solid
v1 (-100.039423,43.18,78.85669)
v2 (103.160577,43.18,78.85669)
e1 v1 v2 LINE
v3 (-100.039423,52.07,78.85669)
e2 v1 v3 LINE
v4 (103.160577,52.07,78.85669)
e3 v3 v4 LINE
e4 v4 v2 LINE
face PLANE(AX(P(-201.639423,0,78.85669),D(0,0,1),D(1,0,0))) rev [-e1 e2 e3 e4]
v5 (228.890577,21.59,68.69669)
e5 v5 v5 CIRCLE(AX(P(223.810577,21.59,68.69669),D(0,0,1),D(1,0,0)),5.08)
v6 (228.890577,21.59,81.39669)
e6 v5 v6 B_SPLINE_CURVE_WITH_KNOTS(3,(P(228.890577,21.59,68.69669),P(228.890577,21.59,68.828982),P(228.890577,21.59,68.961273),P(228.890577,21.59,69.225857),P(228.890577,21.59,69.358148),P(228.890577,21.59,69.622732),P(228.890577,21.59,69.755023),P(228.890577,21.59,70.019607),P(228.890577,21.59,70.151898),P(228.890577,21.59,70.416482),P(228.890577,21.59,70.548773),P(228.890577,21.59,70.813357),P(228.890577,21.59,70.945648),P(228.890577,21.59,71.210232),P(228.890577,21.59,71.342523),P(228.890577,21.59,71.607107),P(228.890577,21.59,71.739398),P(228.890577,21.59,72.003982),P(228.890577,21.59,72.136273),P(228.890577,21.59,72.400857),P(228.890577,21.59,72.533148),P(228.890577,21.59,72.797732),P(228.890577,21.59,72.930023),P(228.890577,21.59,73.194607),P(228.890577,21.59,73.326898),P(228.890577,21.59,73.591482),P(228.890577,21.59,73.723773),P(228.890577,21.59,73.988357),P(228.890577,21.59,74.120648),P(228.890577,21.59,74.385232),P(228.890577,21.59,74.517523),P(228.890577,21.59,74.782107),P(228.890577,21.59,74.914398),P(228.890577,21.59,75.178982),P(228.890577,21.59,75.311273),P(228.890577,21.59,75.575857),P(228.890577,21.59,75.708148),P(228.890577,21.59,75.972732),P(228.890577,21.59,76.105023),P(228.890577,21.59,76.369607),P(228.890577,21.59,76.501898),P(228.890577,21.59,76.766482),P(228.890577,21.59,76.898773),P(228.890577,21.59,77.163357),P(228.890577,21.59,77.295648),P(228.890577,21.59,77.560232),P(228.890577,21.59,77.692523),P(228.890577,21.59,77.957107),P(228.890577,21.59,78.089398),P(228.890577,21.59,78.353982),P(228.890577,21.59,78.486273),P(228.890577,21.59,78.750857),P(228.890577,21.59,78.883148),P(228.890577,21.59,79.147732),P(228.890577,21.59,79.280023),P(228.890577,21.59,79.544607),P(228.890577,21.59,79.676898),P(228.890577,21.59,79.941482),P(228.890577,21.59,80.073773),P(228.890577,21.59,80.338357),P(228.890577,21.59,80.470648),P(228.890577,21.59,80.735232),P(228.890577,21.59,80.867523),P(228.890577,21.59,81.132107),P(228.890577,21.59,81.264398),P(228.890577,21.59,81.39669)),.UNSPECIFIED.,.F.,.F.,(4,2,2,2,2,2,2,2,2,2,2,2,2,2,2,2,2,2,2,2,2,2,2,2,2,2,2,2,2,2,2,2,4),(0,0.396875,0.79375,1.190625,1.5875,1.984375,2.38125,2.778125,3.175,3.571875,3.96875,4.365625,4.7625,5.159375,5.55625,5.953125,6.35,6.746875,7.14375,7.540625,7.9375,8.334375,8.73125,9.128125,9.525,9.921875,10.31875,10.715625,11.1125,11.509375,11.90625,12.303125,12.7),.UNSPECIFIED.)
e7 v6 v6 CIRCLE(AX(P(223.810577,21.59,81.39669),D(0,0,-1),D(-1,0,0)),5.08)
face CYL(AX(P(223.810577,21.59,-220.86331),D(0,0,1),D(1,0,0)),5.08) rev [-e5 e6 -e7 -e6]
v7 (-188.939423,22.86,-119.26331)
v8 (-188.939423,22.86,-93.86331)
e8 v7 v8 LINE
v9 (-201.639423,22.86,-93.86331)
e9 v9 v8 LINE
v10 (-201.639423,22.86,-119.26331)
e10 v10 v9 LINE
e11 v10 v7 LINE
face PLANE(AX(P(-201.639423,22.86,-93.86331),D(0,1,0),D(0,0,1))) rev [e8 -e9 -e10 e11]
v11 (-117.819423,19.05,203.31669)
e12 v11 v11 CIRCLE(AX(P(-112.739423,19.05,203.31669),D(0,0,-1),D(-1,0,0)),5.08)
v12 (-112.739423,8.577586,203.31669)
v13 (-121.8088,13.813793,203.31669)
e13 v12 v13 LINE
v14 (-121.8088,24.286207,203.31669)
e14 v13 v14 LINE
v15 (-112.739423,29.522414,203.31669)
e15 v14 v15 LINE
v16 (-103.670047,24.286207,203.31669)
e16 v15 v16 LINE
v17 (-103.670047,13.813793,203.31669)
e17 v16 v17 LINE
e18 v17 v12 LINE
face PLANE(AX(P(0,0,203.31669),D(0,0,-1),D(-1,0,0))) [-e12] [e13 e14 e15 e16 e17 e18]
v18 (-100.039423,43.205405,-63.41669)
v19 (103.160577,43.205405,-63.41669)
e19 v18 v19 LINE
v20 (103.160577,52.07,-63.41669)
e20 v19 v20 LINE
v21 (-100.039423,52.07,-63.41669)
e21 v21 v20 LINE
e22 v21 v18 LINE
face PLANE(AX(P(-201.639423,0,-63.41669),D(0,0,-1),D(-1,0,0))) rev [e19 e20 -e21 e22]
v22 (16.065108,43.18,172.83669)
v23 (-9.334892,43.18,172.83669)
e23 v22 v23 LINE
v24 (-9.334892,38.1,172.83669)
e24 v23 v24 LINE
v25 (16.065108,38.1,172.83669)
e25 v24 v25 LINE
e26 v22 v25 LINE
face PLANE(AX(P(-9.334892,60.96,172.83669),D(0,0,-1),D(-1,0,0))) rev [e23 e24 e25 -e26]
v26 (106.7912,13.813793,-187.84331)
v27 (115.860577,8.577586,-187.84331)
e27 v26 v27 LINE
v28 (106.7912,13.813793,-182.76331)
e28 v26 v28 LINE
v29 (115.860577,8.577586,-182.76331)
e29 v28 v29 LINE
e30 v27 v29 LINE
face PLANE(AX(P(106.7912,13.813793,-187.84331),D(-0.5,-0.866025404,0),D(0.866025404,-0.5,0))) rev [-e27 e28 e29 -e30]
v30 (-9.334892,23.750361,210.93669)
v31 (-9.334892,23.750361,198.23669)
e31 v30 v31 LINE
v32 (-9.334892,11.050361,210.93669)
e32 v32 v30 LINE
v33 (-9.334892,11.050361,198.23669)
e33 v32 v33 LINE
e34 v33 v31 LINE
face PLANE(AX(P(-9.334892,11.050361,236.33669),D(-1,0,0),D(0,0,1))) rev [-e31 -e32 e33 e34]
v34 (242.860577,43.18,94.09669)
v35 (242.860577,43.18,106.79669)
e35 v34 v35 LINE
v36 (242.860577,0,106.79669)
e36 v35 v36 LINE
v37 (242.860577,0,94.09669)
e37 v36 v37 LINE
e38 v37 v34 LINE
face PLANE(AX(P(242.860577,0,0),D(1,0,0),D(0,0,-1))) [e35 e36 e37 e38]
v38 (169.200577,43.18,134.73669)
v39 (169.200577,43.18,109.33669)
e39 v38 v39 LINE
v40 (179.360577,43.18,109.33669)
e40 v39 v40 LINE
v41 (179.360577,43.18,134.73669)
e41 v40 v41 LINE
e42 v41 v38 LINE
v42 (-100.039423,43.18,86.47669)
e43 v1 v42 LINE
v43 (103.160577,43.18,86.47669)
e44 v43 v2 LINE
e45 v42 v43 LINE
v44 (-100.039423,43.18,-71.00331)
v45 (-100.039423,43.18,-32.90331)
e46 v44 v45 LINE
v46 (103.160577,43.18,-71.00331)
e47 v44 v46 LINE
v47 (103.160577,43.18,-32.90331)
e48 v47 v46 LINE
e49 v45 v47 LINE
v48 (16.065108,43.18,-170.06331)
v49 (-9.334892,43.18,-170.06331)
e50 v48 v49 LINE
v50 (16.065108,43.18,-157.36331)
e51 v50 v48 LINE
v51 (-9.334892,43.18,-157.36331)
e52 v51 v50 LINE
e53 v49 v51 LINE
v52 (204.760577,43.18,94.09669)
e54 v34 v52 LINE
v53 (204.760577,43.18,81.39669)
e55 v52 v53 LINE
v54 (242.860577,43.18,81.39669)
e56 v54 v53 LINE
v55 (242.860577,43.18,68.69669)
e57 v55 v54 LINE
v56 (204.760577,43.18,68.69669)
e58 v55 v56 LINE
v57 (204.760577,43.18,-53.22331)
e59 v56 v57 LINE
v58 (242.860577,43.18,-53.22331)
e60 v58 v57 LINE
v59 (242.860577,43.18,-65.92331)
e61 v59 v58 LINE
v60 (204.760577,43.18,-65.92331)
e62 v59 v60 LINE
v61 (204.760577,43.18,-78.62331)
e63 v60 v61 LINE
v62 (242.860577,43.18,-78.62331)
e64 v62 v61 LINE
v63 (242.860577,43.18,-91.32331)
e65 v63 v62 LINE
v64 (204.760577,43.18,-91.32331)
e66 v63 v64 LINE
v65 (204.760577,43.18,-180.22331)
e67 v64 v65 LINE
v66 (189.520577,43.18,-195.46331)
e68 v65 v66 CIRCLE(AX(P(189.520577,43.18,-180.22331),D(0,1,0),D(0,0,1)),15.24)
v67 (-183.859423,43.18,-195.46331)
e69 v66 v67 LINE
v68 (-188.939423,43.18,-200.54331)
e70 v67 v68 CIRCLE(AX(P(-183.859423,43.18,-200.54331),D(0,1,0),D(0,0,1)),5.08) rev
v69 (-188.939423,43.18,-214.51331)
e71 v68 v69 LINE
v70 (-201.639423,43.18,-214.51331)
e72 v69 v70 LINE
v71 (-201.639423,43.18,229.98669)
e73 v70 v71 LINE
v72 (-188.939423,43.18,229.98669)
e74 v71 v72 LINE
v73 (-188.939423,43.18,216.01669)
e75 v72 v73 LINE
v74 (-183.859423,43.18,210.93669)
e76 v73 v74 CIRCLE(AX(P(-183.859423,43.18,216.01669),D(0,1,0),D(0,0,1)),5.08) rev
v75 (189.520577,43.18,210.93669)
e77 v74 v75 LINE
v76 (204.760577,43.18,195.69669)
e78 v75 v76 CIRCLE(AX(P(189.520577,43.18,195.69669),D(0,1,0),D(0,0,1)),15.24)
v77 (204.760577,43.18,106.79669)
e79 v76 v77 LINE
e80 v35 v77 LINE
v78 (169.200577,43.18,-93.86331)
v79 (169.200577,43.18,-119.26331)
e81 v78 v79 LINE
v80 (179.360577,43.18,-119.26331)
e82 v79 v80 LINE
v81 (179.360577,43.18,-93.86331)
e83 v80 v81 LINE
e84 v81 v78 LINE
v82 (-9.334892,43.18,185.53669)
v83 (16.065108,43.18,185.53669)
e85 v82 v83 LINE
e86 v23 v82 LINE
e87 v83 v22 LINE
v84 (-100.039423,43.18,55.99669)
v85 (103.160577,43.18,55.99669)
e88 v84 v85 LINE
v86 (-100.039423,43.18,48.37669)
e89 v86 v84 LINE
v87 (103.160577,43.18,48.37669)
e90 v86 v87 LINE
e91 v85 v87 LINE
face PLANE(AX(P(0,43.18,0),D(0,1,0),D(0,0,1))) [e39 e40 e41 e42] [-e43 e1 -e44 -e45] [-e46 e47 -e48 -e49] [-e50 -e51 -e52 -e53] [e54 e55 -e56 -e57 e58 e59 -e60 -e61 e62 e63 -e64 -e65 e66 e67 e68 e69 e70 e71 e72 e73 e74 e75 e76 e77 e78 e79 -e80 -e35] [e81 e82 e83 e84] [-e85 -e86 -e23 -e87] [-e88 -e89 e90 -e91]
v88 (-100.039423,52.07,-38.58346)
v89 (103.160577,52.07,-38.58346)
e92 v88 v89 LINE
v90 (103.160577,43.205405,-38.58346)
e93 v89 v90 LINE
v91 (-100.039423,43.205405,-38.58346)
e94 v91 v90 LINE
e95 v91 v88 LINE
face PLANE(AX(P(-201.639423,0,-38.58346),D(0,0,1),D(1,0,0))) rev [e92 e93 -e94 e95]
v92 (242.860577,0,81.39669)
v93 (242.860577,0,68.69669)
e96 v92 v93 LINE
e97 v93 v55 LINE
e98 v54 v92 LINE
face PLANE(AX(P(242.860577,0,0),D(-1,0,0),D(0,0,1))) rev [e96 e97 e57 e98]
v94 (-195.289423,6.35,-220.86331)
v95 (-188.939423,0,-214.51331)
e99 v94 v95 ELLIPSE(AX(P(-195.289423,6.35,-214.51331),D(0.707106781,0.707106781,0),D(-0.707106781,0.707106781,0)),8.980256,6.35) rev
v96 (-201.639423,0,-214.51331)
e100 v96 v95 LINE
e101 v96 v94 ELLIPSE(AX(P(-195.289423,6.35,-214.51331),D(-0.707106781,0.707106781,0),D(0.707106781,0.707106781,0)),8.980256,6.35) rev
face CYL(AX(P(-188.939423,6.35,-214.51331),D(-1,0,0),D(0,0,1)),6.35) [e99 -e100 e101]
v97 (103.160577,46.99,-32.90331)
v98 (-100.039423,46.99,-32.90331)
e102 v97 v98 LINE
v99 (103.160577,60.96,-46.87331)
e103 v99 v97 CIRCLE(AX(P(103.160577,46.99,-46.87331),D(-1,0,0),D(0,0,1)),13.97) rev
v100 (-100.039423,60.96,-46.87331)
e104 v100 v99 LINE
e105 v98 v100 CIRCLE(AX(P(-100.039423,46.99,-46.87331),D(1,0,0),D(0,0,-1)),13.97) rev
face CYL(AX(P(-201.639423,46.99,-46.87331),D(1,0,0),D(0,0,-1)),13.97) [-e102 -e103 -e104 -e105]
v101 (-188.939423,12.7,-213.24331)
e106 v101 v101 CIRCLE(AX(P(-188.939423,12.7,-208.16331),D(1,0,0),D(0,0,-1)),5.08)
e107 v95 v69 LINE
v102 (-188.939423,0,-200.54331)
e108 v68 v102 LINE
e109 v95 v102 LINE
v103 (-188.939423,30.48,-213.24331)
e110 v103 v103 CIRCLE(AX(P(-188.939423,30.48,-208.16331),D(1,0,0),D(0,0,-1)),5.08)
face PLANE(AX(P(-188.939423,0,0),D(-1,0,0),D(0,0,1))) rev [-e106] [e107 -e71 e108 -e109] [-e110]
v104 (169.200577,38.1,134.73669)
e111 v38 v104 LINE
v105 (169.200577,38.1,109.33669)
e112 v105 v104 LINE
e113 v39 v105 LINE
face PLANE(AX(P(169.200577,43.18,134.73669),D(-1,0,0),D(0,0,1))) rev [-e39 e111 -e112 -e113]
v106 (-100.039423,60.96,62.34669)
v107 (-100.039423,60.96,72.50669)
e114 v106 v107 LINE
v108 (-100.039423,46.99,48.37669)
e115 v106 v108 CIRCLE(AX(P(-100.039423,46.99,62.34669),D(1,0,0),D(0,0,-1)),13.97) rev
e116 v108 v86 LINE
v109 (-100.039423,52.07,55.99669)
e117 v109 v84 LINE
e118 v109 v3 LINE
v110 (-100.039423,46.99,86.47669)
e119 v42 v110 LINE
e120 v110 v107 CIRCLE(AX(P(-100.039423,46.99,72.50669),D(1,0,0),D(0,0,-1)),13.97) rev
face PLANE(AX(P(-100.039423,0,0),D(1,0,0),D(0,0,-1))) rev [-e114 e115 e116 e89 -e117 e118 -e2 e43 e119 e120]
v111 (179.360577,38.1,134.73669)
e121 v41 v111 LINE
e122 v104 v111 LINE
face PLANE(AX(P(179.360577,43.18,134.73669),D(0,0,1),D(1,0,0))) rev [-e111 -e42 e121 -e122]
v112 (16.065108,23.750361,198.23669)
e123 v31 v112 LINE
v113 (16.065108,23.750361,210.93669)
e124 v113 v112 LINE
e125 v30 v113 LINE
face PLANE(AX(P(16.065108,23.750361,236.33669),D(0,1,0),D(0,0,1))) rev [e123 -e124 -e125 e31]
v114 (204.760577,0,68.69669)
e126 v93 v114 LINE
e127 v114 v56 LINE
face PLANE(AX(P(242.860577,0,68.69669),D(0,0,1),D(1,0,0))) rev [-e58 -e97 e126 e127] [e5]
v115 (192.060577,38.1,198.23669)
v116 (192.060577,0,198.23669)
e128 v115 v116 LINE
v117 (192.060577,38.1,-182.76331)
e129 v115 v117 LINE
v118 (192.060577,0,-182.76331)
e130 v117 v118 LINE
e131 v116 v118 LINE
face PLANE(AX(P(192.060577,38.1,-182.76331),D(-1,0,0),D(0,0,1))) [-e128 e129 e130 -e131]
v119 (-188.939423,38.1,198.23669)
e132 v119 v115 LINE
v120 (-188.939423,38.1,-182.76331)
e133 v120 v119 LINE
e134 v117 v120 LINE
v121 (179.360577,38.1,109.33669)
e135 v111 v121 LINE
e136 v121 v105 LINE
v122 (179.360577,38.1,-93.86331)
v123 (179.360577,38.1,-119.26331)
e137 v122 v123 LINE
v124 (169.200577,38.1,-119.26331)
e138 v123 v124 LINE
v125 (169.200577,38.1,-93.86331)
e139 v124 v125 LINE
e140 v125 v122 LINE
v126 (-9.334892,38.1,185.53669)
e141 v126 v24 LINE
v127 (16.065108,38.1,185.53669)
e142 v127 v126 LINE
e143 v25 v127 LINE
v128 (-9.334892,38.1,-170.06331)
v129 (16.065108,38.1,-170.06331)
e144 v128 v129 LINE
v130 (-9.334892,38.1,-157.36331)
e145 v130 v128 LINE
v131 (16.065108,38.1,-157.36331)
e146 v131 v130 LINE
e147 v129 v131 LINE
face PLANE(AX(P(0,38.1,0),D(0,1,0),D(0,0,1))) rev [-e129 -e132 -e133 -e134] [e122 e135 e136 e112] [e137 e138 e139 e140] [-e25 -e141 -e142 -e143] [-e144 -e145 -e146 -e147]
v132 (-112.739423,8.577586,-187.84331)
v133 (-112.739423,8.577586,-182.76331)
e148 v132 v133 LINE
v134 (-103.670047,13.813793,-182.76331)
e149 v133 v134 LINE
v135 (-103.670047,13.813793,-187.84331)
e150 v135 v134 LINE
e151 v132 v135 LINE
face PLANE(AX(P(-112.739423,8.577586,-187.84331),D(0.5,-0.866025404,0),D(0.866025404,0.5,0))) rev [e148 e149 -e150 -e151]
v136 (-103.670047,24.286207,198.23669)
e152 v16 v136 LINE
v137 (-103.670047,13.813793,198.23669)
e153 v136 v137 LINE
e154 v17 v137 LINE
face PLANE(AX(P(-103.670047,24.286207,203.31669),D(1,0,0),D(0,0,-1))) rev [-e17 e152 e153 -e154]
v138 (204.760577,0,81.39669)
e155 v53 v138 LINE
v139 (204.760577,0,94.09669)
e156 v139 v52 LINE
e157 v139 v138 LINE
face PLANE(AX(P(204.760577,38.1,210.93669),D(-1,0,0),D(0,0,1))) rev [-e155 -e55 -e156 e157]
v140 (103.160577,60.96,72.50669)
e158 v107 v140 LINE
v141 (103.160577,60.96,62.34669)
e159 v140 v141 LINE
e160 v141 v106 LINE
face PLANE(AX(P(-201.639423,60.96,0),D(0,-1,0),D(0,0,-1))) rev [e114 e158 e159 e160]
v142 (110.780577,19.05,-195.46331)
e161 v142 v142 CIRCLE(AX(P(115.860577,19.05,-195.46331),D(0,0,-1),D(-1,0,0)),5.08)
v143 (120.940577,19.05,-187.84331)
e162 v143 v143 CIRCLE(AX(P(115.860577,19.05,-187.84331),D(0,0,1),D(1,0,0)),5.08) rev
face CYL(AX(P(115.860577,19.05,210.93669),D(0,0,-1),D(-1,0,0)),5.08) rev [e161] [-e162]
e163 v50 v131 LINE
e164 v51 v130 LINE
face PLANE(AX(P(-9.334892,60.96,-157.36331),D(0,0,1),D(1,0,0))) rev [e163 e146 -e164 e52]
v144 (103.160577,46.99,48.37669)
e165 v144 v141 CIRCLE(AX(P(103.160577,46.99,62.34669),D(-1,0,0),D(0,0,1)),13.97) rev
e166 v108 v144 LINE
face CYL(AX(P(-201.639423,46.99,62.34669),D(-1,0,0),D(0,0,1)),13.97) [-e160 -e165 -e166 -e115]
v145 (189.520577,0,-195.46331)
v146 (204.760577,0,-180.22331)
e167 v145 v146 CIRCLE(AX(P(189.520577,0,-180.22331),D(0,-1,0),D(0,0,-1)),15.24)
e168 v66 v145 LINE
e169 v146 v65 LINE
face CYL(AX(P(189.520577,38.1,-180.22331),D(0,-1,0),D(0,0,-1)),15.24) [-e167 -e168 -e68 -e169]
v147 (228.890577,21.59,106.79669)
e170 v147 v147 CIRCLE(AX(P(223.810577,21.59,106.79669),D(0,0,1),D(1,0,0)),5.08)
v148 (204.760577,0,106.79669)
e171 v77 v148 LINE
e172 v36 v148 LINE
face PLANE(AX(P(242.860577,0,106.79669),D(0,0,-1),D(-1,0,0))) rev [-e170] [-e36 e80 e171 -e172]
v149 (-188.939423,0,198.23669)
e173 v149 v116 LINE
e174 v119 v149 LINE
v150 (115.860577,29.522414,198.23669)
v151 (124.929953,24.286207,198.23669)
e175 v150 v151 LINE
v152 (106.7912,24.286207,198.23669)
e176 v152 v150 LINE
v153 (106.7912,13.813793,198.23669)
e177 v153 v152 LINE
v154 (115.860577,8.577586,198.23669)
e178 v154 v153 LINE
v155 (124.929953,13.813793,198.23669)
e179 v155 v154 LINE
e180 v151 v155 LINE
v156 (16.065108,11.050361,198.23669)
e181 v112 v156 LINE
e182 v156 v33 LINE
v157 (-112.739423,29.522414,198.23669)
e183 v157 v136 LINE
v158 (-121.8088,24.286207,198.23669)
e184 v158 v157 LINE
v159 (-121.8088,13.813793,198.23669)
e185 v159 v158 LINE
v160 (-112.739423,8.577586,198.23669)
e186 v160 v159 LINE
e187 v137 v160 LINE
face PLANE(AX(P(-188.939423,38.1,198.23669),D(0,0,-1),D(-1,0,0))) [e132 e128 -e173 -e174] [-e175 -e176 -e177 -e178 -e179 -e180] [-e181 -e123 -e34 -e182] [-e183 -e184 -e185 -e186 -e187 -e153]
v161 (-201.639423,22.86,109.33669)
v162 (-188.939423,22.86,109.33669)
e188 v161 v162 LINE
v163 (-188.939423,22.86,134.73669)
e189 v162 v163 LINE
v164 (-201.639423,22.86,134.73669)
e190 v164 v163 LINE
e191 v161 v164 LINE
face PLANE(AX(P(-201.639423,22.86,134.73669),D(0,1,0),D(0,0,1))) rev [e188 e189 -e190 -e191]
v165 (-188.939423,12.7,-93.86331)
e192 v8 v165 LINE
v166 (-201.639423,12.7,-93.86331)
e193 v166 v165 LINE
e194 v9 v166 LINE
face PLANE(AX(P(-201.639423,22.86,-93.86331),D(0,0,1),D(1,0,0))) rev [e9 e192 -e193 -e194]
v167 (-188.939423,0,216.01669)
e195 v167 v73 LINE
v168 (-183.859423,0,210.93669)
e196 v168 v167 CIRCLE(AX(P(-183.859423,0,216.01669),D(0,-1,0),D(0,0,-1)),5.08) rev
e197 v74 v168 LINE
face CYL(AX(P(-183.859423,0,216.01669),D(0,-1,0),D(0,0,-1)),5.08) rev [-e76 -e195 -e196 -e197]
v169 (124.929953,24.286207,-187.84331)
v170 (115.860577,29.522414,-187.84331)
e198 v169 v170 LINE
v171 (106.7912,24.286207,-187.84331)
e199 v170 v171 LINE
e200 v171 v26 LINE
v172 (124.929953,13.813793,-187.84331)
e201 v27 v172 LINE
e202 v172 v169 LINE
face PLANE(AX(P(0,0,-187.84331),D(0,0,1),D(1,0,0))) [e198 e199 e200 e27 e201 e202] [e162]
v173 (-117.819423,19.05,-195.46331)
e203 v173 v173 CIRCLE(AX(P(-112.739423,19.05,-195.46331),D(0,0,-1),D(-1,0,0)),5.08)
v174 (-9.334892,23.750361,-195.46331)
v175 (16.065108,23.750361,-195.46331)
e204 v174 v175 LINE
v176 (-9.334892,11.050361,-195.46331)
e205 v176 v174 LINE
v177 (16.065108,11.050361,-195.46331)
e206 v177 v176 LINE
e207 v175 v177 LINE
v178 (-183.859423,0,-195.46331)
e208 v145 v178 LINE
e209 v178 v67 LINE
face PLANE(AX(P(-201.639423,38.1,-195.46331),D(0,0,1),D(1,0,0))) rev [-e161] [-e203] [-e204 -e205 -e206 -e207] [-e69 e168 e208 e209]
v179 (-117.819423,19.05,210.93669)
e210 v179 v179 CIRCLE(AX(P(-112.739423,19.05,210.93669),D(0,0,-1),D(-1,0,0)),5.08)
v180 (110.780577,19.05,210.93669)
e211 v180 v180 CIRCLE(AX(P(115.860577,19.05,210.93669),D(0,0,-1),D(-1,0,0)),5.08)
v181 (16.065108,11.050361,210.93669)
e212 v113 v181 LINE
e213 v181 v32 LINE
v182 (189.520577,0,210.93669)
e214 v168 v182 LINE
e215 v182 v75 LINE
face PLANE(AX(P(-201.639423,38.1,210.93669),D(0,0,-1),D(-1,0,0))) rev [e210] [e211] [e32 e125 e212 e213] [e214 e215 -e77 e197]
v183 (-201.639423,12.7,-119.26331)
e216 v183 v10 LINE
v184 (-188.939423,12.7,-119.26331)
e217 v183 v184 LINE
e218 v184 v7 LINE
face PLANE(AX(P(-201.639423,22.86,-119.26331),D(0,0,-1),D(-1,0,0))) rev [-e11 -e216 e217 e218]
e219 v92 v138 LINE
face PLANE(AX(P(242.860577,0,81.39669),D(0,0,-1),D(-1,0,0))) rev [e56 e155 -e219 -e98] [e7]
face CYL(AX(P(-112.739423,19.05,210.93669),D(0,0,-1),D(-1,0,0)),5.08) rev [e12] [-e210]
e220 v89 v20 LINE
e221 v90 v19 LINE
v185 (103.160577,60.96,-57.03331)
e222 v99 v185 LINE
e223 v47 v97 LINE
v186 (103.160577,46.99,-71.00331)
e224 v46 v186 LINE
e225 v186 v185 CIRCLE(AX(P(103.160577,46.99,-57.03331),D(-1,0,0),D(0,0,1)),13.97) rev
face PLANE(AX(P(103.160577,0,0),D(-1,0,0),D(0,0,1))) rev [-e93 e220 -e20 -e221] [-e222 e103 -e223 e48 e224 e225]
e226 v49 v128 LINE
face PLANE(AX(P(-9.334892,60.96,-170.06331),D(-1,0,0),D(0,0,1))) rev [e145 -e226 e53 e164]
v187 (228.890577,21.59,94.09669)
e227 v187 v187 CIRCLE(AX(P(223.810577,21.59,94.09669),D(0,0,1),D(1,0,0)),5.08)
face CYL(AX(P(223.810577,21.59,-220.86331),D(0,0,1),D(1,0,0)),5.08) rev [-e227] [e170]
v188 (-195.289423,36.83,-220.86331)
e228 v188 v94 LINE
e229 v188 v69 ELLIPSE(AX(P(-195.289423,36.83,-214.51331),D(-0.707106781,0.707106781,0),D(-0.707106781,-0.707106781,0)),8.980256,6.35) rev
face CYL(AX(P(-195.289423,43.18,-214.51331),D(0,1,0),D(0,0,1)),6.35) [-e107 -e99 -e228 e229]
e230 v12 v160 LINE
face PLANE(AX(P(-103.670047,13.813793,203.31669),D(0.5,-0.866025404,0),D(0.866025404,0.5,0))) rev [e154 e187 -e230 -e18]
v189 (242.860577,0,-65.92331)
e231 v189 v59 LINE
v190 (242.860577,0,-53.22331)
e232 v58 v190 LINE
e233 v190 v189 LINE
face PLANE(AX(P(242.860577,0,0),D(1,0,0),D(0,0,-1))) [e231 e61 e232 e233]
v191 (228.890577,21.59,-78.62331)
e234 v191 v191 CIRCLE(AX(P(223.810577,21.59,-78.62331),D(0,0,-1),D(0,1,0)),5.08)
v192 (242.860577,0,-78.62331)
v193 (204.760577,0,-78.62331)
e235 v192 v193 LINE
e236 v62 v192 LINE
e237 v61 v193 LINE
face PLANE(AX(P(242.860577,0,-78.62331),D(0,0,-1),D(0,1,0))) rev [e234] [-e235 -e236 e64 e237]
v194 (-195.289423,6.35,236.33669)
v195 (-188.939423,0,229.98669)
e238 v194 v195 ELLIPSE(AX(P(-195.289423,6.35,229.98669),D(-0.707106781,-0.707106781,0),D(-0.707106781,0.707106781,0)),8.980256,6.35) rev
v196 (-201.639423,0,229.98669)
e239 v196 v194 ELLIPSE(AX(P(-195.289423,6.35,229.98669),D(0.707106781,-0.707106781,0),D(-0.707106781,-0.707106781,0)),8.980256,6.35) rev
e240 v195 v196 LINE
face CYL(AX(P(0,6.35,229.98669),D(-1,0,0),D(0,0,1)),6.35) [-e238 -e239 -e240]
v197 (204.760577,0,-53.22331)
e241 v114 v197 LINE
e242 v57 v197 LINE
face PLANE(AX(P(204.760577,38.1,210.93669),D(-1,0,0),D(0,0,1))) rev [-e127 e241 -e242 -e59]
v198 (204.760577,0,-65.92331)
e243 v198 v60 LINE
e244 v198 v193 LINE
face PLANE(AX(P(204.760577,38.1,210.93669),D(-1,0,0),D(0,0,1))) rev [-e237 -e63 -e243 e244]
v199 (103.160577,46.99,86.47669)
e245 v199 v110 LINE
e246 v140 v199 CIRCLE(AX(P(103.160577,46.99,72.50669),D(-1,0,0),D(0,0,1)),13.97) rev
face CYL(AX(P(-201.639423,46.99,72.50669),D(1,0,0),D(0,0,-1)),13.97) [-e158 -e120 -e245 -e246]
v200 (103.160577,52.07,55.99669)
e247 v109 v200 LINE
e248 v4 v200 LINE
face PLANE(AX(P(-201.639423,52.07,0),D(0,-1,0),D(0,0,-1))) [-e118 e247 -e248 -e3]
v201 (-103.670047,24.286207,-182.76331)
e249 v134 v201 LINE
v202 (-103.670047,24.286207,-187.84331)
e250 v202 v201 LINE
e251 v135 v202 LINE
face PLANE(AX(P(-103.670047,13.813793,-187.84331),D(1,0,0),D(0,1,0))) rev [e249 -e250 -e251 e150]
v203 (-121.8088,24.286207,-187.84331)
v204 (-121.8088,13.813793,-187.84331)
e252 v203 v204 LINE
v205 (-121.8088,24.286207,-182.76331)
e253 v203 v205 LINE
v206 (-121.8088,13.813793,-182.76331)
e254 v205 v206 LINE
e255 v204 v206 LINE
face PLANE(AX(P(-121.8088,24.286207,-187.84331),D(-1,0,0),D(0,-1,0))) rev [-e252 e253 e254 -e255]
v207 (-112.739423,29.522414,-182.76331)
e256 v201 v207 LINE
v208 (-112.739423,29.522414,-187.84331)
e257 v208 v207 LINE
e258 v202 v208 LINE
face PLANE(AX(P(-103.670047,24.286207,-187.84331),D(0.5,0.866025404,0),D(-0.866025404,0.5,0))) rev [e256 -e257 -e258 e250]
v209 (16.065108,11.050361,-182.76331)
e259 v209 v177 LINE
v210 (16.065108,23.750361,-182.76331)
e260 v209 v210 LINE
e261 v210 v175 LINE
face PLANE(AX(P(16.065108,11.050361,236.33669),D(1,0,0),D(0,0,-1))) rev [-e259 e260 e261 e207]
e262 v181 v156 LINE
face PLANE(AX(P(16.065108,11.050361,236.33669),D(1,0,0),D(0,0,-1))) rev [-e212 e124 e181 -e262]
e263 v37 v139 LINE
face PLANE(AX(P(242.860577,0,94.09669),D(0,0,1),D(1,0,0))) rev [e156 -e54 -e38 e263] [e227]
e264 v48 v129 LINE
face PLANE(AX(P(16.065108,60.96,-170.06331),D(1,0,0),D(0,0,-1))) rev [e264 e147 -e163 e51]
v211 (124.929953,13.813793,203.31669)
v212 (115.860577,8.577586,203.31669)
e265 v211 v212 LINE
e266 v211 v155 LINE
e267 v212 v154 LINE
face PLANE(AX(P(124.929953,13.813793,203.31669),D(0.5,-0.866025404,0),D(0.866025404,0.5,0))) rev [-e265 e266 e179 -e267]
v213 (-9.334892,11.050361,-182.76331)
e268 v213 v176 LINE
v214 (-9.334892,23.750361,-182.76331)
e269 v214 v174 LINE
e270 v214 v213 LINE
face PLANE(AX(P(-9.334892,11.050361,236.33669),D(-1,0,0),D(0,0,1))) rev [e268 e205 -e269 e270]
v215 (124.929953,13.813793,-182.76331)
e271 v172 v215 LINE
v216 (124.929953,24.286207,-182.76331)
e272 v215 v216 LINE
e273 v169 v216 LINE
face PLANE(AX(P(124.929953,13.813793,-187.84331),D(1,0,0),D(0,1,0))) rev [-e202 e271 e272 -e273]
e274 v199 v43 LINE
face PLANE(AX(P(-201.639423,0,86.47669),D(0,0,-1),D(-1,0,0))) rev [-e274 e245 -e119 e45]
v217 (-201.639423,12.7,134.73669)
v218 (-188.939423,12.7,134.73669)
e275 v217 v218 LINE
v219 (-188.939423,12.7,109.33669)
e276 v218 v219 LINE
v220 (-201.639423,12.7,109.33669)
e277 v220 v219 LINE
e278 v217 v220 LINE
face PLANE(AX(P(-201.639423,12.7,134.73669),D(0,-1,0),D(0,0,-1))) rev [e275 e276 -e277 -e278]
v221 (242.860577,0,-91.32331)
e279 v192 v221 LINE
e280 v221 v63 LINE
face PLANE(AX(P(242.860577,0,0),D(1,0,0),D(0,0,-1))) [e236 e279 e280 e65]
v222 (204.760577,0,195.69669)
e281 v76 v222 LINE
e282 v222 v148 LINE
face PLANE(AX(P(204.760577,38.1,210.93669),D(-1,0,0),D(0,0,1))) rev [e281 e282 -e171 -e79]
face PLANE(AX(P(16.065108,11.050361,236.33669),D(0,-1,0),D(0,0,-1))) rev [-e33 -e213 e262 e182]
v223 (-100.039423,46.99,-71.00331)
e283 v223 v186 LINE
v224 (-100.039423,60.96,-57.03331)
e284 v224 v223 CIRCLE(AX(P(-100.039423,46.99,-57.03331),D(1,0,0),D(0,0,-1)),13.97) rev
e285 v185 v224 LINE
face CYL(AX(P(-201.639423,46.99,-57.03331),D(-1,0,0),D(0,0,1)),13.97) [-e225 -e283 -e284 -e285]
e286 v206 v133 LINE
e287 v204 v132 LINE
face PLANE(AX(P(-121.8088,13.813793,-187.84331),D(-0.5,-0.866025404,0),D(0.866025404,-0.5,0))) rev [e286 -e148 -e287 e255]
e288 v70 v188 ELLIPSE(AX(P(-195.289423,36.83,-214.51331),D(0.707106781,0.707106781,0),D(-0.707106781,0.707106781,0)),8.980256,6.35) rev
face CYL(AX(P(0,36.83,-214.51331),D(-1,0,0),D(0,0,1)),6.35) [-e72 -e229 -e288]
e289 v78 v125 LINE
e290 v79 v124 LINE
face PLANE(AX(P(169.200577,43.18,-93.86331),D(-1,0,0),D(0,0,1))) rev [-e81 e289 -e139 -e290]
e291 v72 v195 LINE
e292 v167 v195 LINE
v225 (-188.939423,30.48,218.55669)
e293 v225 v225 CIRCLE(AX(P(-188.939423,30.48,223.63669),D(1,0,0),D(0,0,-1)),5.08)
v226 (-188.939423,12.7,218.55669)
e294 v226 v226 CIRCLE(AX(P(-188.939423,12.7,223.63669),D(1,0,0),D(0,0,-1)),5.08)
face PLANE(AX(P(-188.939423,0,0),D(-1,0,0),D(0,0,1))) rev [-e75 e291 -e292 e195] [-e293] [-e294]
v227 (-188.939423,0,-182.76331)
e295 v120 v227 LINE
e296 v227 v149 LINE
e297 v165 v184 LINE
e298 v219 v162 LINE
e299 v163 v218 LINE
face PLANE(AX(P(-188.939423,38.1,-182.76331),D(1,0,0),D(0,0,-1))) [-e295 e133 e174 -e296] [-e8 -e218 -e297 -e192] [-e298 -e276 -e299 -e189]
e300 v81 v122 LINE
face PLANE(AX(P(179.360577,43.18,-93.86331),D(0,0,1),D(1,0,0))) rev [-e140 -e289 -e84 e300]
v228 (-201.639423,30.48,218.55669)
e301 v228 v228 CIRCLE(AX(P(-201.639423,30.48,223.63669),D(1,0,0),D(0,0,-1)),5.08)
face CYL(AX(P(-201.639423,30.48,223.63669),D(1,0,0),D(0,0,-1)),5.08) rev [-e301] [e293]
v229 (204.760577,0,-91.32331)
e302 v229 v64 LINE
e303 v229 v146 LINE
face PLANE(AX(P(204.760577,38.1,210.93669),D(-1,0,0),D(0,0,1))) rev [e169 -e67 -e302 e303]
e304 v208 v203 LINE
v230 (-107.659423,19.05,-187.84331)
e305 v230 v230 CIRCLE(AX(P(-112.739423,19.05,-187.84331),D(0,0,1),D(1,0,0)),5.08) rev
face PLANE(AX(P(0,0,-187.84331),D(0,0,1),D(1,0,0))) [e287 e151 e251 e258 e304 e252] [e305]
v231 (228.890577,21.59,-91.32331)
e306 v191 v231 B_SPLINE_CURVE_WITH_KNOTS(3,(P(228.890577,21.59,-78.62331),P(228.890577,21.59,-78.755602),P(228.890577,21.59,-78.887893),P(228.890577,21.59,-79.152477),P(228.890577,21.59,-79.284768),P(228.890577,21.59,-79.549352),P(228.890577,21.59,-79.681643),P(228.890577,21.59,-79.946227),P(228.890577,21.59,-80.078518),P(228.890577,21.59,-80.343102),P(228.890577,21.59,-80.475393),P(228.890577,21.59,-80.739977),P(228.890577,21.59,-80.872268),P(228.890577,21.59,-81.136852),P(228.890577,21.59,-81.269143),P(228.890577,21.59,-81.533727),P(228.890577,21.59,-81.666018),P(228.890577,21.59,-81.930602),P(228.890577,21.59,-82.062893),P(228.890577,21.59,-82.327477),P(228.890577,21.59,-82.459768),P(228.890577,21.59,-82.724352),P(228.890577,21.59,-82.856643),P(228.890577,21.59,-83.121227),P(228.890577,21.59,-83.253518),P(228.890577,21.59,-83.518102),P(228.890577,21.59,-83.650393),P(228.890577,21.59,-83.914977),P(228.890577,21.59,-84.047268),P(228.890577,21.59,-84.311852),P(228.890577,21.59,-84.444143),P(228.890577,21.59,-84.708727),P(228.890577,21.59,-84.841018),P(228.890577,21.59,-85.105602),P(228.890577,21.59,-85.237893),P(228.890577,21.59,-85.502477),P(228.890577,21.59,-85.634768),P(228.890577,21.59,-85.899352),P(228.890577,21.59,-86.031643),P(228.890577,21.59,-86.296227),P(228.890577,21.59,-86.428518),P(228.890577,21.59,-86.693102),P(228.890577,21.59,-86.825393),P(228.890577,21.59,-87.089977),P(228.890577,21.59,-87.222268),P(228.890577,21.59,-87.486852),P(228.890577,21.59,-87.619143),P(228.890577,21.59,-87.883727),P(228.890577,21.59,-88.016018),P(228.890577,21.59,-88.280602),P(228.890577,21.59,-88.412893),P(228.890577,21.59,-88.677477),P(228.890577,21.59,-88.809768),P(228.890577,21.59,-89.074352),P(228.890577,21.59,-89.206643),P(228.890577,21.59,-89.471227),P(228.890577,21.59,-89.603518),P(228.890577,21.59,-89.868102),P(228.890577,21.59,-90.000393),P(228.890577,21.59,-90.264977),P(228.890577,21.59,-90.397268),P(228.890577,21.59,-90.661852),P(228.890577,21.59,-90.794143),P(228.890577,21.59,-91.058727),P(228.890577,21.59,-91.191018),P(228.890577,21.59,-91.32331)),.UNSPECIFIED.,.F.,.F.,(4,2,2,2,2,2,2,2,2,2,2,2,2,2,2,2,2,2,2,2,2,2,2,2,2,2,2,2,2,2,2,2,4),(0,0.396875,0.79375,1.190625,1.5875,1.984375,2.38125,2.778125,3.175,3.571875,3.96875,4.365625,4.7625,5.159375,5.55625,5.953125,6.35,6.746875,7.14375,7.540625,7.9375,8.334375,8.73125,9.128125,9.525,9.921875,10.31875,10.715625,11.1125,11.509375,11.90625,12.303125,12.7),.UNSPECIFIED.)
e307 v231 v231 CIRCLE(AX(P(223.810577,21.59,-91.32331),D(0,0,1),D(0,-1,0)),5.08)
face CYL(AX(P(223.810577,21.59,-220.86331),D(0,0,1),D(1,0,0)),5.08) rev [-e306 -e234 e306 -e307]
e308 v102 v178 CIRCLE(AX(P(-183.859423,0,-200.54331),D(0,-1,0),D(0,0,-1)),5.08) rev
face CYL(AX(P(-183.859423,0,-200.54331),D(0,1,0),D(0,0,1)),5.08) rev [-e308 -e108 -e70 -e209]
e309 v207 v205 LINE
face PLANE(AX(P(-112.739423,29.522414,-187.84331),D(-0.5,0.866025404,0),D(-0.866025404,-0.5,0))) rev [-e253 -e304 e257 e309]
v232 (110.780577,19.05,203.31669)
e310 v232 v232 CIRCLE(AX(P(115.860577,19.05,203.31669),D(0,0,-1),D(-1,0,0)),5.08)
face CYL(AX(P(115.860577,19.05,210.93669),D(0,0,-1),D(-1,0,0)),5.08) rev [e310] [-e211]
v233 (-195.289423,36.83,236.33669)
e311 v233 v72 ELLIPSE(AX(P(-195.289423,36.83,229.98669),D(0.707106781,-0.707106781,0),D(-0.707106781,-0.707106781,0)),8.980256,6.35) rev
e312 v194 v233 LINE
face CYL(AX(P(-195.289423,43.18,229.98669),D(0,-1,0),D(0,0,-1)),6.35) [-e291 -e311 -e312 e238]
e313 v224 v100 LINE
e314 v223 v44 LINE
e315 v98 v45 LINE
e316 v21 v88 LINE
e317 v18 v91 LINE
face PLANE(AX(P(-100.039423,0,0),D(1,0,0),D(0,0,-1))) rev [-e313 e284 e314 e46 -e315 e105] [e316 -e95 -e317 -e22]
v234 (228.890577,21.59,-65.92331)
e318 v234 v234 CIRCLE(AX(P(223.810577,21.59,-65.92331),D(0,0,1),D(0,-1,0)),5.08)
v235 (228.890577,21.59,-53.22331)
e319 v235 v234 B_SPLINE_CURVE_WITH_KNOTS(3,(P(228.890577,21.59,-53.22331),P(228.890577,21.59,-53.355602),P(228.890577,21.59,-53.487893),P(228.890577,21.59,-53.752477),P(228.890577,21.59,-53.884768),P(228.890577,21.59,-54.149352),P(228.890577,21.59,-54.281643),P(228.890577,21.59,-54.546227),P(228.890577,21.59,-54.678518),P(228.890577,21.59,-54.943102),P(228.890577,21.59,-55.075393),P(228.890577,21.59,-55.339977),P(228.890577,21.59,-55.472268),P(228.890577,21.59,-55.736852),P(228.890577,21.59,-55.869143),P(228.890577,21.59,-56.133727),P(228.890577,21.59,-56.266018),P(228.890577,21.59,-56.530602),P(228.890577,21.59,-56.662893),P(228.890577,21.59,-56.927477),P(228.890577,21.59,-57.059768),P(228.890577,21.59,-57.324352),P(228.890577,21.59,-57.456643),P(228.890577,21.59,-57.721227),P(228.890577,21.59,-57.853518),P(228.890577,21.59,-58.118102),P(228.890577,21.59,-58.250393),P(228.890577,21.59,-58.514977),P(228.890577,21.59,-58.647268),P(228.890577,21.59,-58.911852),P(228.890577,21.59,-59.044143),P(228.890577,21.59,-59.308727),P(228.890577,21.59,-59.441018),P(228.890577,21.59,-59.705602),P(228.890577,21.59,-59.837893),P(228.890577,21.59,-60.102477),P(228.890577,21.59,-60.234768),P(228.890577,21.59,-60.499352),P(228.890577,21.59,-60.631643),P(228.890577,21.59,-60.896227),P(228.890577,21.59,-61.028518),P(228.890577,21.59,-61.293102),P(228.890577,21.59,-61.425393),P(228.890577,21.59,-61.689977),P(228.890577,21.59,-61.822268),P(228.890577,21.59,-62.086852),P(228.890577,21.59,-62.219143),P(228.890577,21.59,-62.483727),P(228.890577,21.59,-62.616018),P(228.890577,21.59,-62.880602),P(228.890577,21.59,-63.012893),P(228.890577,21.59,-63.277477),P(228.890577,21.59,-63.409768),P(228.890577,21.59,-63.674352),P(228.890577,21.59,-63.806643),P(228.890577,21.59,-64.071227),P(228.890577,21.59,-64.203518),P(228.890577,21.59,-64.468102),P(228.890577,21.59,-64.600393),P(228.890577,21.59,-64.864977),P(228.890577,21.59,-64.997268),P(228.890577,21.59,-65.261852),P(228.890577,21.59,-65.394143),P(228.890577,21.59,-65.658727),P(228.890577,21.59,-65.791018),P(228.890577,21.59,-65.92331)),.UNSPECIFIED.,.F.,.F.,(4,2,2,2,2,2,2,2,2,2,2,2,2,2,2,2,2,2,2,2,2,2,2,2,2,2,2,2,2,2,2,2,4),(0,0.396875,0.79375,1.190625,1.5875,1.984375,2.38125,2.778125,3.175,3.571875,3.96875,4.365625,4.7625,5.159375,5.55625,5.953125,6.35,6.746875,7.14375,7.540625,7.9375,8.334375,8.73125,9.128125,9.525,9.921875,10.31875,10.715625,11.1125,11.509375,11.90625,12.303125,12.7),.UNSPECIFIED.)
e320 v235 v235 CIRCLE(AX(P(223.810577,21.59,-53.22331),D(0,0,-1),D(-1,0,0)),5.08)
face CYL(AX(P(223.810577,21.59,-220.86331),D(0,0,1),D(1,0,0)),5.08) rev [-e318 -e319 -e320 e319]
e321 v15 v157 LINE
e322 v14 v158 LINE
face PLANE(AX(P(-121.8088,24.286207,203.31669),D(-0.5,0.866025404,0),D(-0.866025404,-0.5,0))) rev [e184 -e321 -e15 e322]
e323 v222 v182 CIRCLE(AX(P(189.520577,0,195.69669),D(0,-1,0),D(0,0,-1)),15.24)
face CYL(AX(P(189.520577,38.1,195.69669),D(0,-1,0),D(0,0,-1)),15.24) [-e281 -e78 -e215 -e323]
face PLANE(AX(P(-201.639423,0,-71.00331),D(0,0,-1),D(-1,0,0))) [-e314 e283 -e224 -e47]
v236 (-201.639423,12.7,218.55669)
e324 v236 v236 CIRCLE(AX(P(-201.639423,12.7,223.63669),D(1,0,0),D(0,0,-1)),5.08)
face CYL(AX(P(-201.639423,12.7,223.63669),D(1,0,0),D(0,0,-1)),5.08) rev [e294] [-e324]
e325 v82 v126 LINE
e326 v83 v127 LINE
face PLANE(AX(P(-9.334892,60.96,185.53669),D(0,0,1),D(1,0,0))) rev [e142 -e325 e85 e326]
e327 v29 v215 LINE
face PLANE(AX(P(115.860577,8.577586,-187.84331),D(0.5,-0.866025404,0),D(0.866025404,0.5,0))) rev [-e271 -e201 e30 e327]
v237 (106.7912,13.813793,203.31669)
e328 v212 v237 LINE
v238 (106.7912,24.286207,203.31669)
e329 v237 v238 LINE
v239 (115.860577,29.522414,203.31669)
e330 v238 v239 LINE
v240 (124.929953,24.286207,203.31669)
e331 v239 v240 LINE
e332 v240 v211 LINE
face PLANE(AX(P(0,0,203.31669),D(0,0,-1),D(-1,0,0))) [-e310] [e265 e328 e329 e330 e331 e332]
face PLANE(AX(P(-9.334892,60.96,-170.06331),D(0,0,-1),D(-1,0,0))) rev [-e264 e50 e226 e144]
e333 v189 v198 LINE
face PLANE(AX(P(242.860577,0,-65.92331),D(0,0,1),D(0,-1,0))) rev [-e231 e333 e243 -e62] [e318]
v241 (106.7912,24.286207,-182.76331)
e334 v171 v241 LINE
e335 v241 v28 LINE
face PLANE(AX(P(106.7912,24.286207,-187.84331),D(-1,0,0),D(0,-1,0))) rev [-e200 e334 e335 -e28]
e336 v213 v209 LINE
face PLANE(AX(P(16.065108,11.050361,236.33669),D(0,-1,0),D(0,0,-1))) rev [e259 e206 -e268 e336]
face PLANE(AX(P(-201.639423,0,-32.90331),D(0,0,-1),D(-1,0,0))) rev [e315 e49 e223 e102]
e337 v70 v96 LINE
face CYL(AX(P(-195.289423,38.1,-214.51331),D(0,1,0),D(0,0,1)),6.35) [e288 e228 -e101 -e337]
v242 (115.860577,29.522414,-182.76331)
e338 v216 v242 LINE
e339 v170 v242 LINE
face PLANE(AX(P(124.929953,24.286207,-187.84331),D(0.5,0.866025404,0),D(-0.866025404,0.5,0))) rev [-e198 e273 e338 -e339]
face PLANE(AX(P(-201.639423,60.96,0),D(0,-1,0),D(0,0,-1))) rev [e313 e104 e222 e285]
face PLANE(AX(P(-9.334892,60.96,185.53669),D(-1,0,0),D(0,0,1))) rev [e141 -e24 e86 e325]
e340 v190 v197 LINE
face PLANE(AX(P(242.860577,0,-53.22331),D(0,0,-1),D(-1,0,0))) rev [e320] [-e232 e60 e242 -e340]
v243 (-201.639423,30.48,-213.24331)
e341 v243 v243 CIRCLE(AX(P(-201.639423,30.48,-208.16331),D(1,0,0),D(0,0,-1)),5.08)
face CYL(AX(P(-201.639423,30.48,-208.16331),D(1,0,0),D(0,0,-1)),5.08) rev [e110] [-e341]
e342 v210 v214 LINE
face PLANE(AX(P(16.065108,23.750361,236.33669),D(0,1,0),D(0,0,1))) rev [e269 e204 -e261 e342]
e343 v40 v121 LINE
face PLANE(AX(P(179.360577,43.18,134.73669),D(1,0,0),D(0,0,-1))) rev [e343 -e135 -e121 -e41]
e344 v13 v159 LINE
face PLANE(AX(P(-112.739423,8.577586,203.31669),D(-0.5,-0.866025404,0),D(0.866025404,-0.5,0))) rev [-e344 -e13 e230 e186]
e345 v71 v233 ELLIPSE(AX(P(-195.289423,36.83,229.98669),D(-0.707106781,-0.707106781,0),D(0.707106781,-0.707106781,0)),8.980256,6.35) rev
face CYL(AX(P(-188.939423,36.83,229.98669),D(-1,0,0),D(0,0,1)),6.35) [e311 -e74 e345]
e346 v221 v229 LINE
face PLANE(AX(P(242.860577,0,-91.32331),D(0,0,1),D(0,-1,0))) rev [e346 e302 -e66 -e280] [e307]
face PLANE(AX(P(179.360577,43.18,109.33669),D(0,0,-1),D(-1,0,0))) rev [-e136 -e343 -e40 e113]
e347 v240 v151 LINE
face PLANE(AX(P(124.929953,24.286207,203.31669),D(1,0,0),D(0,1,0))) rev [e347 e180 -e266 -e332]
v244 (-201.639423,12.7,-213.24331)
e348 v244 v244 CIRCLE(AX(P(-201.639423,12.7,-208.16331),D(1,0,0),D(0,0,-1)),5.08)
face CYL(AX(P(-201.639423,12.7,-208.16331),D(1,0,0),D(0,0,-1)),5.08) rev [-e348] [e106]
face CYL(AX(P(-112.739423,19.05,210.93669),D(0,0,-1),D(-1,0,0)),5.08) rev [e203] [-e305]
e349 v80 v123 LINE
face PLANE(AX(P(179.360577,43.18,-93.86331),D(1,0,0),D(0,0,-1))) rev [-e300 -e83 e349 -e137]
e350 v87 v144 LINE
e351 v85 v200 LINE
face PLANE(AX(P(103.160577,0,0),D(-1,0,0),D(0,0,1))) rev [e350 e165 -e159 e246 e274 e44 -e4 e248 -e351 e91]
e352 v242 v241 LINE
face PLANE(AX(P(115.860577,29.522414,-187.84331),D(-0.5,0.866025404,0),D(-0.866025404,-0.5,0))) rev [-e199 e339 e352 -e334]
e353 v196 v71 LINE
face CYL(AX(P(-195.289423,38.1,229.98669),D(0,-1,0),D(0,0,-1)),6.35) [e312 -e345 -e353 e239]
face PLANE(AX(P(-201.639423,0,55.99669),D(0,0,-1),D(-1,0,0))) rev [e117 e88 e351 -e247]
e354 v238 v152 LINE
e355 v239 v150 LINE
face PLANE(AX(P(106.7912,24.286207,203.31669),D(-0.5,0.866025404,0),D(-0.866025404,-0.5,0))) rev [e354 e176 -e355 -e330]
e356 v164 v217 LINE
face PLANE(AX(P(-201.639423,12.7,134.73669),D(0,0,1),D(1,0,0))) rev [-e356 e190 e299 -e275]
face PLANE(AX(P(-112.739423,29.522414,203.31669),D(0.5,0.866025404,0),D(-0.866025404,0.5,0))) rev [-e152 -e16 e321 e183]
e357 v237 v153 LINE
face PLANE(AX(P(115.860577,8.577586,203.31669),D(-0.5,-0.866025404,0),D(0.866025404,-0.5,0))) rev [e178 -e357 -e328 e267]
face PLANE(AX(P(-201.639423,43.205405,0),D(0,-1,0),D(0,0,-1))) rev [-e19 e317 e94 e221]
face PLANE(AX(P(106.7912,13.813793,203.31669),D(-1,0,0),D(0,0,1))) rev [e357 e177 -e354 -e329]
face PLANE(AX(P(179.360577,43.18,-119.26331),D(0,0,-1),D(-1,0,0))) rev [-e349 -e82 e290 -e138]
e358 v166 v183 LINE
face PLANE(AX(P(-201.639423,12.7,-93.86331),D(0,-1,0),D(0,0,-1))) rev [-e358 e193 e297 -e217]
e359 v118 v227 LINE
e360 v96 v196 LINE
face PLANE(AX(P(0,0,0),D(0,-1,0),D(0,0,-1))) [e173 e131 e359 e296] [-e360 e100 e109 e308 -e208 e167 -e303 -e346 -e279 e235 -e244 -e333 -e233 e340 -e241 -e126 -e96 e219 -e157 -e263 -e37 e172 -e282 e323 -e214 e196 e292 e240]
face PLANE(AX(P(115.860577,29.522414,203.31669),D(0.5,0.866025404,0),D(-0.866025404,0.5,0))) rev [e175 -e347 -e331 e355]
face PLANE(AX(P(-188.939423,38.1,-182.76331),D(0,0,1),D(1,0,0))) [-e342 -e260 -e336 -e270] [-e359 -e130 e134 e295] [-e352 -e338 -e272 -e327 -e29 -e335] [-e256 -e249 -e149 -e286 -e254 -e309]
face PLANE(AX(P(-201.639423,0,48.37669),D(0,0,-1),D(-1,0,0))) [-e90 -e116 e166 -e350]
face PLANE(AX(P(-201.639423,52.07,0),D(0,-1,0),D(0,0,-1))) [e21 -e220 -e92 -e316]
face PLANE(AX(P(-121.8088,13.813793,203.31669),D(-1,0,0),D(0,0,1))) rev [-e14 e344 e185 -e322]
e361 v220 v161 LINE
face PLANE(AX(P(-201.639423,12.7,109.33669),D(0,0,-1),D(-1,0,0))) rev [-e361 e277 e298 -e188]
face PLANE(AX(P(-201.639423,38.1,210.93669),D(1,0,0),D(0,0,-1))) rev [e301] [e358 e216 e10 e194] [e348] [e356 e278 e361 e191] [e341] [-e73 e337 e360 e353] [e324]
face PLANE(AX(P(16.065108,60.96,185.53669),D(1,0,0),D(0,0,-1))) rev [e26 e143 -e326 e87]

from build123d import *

# Parameters (mm, degrees)
SKETCH1_W                = 406.4
SKETCH1_H                = 406.4
SKETCH1_W_2              = 381
SKETCH1_H_2              = 381
BOSS_EXTRUDE2_DEPTH      = 38.1
SKETCH2_W                = 406.4
SKETCH2_H                = 406.4
BOSS_EXTRUDE3_DEPTH      = 5.08
CUT_EXTRUDE3_DEPTH       = 5.08
CUT_EXTRUDE4_DEPTH       = 446.859951222
CUT_EXTRUDE4_DEPTH_BACK  = 446.859951222
SKETCH6_R                = 5.08
CUT_EXTRUDE6_DEPTH       = 5.08
SKETCH8_W                = 457.2
SKETCH8_H                = 43.18
BOSS_EXTRUDE4_DEPTH      = 12.7
SKETCH9_R                = 5.08
CUT_EXTRUDE7_DEPTH       = 462.214953622
FILLET2_R                = 15.24
FILLET3_R                = 5.08
FILLET4_R                = 6.35
CUT_EXTRUDE8_DEPTH       = 473.102217157
CUT_EXTRUDE8_DEPTH_BACK  = 473.102217157
SKETCH10_W               = 25.4
SKETCH10_H               = 10.16
CUT_EXTRUDE9_DEPTH       = 316.013546928
CUT_EXTRUDE9_DEPTH_BACK  = 316.013546928
SKETCH11_W               = 10.16
SKETCH11_H               = 25.4
SKETCH13_W               = 38.1
SKETCH13_H               = 17.78
BOSS_EXTRUDE6_DEPTH      = 406.4
FILLET5_R                = 13.97
CUT_EXTRUDE10_DEPTH      = 475.059186858
CUT_EXTRUDE10_DEPTH_BACK = 101.6
SKETCH14_W               = 157.48
SKETCH14_H               = 20.829558228
SKETCH17_W               = 157.48
SKETCH17_H               = 21.78032637
CUT_EXTRUDE11_DEPTH      = 101.6
BOSS_EXTRUDE7_START      = -12.7
SKETCH18_W               = 375.92
SKETCH18_H               = 43.18
BOSS_EXTRUDE7_DEPTH      = 12.7
SKETCH19_W               = 12.7
SKETCH19_H               = 43.18
BOSS_EXTRUDE8_DEPTH      = 38.1
SKETCH20_R               = 5.08
CUT_EXTRUDE12_DEPTH      = 413.381445795
SKETCH21_W               = 23.212308842
SKETCH21_H               = 297.780762004
BOSS_EXTRUDE10_DEPTH     = 5.08
SKETCH22_W               = 25.4
SKETCH22_H               = 12.7
CUT_EXTRUDE13_DEPTH      = 500.147895153
SKETCH23_W               = 25.4
SKETCH23_H               = 12.7
CUT_EXTRUDE14_DEPTH      = 342.010118149


with BuildPart() as part:
    # Sketch1 → Boss-Extrude2 (new body)
    with BuildSketch(Plane(origin=(0, 0, 0), x_dir=(1, 0, 0), z_dir=(0, 1, 0))):
        with Locations((1.560576536, -7.736690009)):
            Rectangle(SKETCH1_W, SKETCH1_H)
        with Locations((1.560576536, -7.736690009)):
            Rectangle(SKETCH1_W_2, SKETCH1_H_2, mode=Mode.SUBTRACT)
    extrude(amount=BOSS_EXTRUDE2_DEPTH)

    # Sketch2 → Boss-Extrude3 (add)
    with BuildSketch(Plane(origin=(0, 38.1, 0), x_dir=(1, 0, 0), z_dir=(0, 1, 0))):
        with Locations((1.560576536, -7.736690009)):
            Rectangle(SKETCH2_W, SKETCH2_H)
    extrude(amount=BOSS_EXTRUDE3_DEPTH)

    # Sketch5 → Cut-Extrude3 (cut)
    with BuildSketch(Plane(origin=(0, 0, 198.236690009), x_dir=(-1, 0, 0), z_dir=(0, 0, -1))):
        Polygon((-115.860576536, 8.577585816), (-106.791199814, 13.813792908), (-106.791199814, 24.286207092), (-115.860576536, 29.522414184), (-124.929953259, 24.286207092), (-124.929953259, 13.813792908), align=None)
        Polygon((112.739423464, 29.522414184), (103.670046741, 24.286207092), (103.670046741, 13.813792908), (112.739423464, 8.577585816), (121.808800186, 13.813792908), (121.808800186, 24.286207092), align=None)
    extrude(amount=-CUT_EXTRUDE3_DEPTH, mode=Mode.SUBTRACT)

    # Sketch6 → Cut-Extrude4 (cut, two sides: drawn at the far end of the back side and taken through both)
    with BuildSketch(Plane(origin=(0, 0, 198.236690009), x_dir=(-1, 0, 0), z_dir=(0, 0, -1)).offset(-CUT_EXTRUDE4_DEPTH_BACK)):
        with Locations((-115.860576536, 19.05)):
            Circle(SKETCH6_R)
        with Locations((112.739423464, 19.05)):
            Circle(SKETCH6_R)
    extrude(amount=CUT_EXTRUDE4_DEPTH + CUT_EXTRUDE4_DEPTH_BACK, mode=Mode.SUBTRACT)

    # Sketch7 → Cut-Extrude6 (cut)
    with BuildSketch(Plane.XY.offset(-182.763309991)):
        Polygon((-112.739423464, 29.522414184), (-121.808800186, 24.286207092), (-121.808800186, 13.813792908), (-112.739423464, 8.577585816), (-103.670046741, 13.813792908), (-103.670046741, 24.286207092), align=None)
        Polygon((115.860576536, 29.522414184), (106.791199814, 24.286207092), (106.791199814, 13.813792908), (115.860576536, 8.577585816), (124.929953259, 13.813792908), (124.929953259, 24.286207092), align=None)
    extrude(amount=-CUT_EXTRUDE6_DEPTH, mode=Mode.SUBTRACT)

    # Sketch8 → Boss-Extrude4 (add)
    with BuildSketch(Plane.ZY.offset(201.639423464)):
        with Locations((7.736690009, 21.59)):
            Rectangle(SKETCH8_W, SKETCH8_H)
    extrude(amount=-BOSS_EXTRUDE4_DEPTH)

    # Sketch9 → Cut-Extrude7 (cut, through all)
    with BuildSketch(Plane(origin=(-188.939423464, 0, 0), x_dir=(0, 0, -1), z_dir=(1, 0, 0))):
        with Locations((208.163309991, 30.48)):
            Circle(SKETCH9_R)
        with Locations((-223.636690009, 30.48)):
            Circle(SKETCH9_R)
        with Locations((-223.636690009, 12.7)):
            Circle(SKETCH9_R)
        with Locations((208.163309991, 12.7)):
            Circle(SKETCH9_R)
    extrude(amount=-CUT_EXTRUDE7_DEPTH, mode=Mode.SUBTRACT)

    # Fillet2
    fillet2_edges = [part.edges().sort_by_distance(p)[0] for p in [
        (204.760576536, 21.59, 210.936690009),
        (204.760576536, 21.59, -195.463309991),
    ]]
    fillet(fillet2_edges, radius=FILLET2_R)

    # Fillet3
    fillet3_edges = [part.edges().sort_by_distance(p)[0] for p in [
        (-188.939423464, 21.59, -195.463309991),
        (-188.939423464, 21.59, 210.936690009),
    ]]
    fillet(fillet3_edges, radius=FILLET3_R)

    # Fillet4
    fillet4_edges = [part.edges().sort_by_distance(p)[0] for p in [
        (-195.289423464, 43.18, -220.863309991),
        (-195.289423464, 0, 236.336690009),
        (-201.639423464, 21.59, -220.863309991),
        (-201.639423464, 21.59, 236.336690009),
        (-188.939423464, 21.59, -220.863309991),
        (-195.289423464, 0, -220.863309991),
        (-188.939423464, 21.59, 236.336690009),
        (-195.289423464, 43.18, 236.336690009),
    ]]
    fillet(fillet4_edges, radius=FILLET4_R - 0.0001)  # a hair under: the kernel refuses the full size

    # Sketch10 → Cut-Extrude8 (cut, two sides: drawn at the far end of the back side and taken through both)
    with BuildSketch(Plane(origin=(204.760576536, 0, 0), x_dir=(0, 0, -1), z_dir=(1, 0, 0)).offset(-CUT_EXTRUDE8_DEPTH_BACK)):
        with Locations((-122.036690009, 17.78)):
            Rectangle(SKETCH10_W, SKETCH10_H)
        with Locations((106.563309991, 17.78)):
            Rectangle(SKETCH10_W, SKETCH10_H)
    extrude(amount=CUT_EXTRUDE8_DEPTH + CUT_EXTRUDE8_DEPTH_BACK, mode=Mode.SUBTRACT)

    # Sketch11 → Cut-Extrude9 (cut, two sides: drawn at the far end of the back side and taken through both)
    with BuildSketch(Plane(origin=(0, 38.1, 0), x_dir=(-1, 0, 0), z_dir=(0, -1, 0)).offset(-CUT_EXTRUDE9_DEPTH_BACK)):
        with Locations((-174.280576536, -122.036690009)):
            Rectangle(SKETCH11_W, SKETCH11_H)
        with Locations((171.159423464, -122.036690009)):
            Rectangle(SKETCH11_W, SKETCH11_H)
        with Locations((-174.280576536, 106.563309991)):
            Rectangle(SKETCH11_W, SKETCH11_H)
        with Locations((171.159423464, 106.563309991)):
            Rectangle(SKETCH11_W, SKETCH11_H)
    extrude(amount=CUT_EXTRUDE9_DEPTH + CUT_EXTRUDE9_DEPTH_BACK, mode=Mode.SUBTRACT)

    # Sketch13 → Boss-Extrude6 (add, through all)
    # profile 1 of 2: a face of its own
    with BuildSketch(Plane(origin=(204.760576536, 0, 0), x_dir=(0, 0, -1), z_dir=(1, 0, 0))):
        Polygon((-86.476690009, 60.96), (-86.476690009, 43.18), (-78.856690009, 43.18), (-78.856690009, 47.73825334), (-78.856690009, 52.07), (-55.996690009, 52.07), (-55.996690009, 48.121507739), (-55.996690009, 43.18), (-48.376690009, 43.18), (-48.376690009, 60.96), align=None)
    # profile 2 of 2: a face of its own
    with BuildSketch(Plane(origin=(204.760576536, 0, 0), x_dir=(0, 0, -1), z_dir=(1, 0, 0))):
        with Locations((51.953309991, 52.07)):
            Rectangle(SKETCH13_W, SKETCH13_H)
        Polygon((38.583459735, 43.205405435), (38.583459735, 47.763658775), (38.583459735, 52.07), (63.41669047, 52.07), (63.41669047, 47.763658775), (63.41669047, 43.205405435), align=None, mode=Mode.SUBTRACT)
    extrude(amount=-BOSS_EXTRUDE6_DEPTH)

    # Fillet5
    fillet5_edges = [part.edges().sort_by_distance(p)[0] for p in [
        (1.560576536, 60.96, 86.476690009),
        (1.560576536, 60.96, 48.376690009),
        (1.560576536, 60.96, -32.903309991),
        (1.560576536, 60.96, -71.003309991),
    ]]
    fillet(fillet5_edges, radius=FILLET5_R)

    # Sketch14 → Cut-Extrude10 (cut, two sides: drawn at the far end of the back side and taken through both)
    with BuildSketch(Plane.ZY.offset(201.639423464).offset(-CUT_EXTRUDE10_DEPTH_BACK)):
        with Locations((7.736690009, 53.594779114)):
            Rectangle(SKETCH14_W, SKETCH14_H)
    extrude(amount=CUT_EXTRUDE10_DEPTH + CUT_EXTRUDE10_DEPTH_BACK, mode=Mode.SUBTRACT)

    # Sketch17 → Cut-Extrude11 (cut)
    with BuildSketch(Plane(origin=(204.760576536, 0, 0), x_dir=(0, 0, -1), z_dir=(1, 0, 0))):
        with Locations((-7.736690009, 54.070163185)):
            Rectangle(SKETCH17_W, SKETCH17_H)
    extrude(amount=-CUT_EXTRUDE11_DEPTH, mode=Mode.SUBTRACT)

    # Sketch18 → Boss-Extrude7 (add)
    with BuildSketch(Plane(origin=(204.760576536, 0, 0), x_dir=(0, 0, -1), z_dir=(1, 0, 0)).offset(BOSS_EXTRUDE7_START)):
        with Locations((-7.736690009, 21.59)):
            Rectangle(SKETCH18_W, SKETCH18_H)
    extrude(amount=BOSS_EXTRUDE7_DEPTH)

    # Sketch19 → Boss-Extrude8 (add)
    with BuildSketch(Plane(origin=(204.760576536, 0, 0), x_dir=(0, 0, -1), z_dir=(1, 0, 0))):
        with Locations((84.973309991, 21.59)):
            Rectangle(SKETCH19_W, SKETCH19_H)
        with Locations((-100.446690009, 21.59)):
            Rectangle(SKETCH19_W, SKETCH19_H)
        with Locations((59.573309991, 21.59)):
            Rectangle(SKETCH19_W, SKETCH19_H)
        with Locations((-75.046690009, 21.59)):
            Rectangle(SKETCH19_W, SKETCH19_H)
    extrude(amount=BOSS_EXTRUDE8_DEPTH)

    # Sketch20 → Cut-Extrude12 (cut, through all)
    with BuildSketch(Plane.XY.offset(106.796690009)):
        with Locations((223.810576536, 21.59)):
            Circle(SKETCH20_R)
    extrude(amount=-CUT_EXTRUDE12_DEPTH, mode=Mode.SUBTRACT)

    # Sketch21 → Boss-Extrude10 (add)
    with BuildSketch(Plane.XZ.offset(-38.1)):
        with Locations((-170.393564794, 16.358404722)):
            Rectangle(SKETCH21_W, SKETCH21_H)
    extrude(amount=-BOSS_EXTRUDE10_DEPTH)

    # Sketch22 → Cut-Extrude13 (cut, through all)
    with BuildSketch(Plane(origin=(0, 0, -195.463309991), x_dir=(-1, 0, 0), z_dir=(0, 0, -1))):
        with Locations((-3.365108494, 17.400361313)):
            Rectangle(SKETCH22_W, SKETCH22_H)
    extrude(amount=-CUT_EXTRUDE13_DEPTH, mode=Mode.SUBTRACT)

    # Sketch23 → Cut-Extrude14 (cut, through all)
    with BuildSketch(Plane(origin=(0, 38.1, 0), x_dir=(-1, 0, 0), z_dir=(0, -1, 0))):
        with Locations((-3.365108494, -179.186690009)):
            Rectangle(SKETCH23_W, SKETCH23_H)
        with Locations((-3.365108494, 163.713309991)):
            Rectangle(SKETCH23_W, SKETCH23_H)
    extrude(amount=-CUT_EXTRUDE14_DEPTH, mode=Mode.SUBTRACT)


solid = part.part
